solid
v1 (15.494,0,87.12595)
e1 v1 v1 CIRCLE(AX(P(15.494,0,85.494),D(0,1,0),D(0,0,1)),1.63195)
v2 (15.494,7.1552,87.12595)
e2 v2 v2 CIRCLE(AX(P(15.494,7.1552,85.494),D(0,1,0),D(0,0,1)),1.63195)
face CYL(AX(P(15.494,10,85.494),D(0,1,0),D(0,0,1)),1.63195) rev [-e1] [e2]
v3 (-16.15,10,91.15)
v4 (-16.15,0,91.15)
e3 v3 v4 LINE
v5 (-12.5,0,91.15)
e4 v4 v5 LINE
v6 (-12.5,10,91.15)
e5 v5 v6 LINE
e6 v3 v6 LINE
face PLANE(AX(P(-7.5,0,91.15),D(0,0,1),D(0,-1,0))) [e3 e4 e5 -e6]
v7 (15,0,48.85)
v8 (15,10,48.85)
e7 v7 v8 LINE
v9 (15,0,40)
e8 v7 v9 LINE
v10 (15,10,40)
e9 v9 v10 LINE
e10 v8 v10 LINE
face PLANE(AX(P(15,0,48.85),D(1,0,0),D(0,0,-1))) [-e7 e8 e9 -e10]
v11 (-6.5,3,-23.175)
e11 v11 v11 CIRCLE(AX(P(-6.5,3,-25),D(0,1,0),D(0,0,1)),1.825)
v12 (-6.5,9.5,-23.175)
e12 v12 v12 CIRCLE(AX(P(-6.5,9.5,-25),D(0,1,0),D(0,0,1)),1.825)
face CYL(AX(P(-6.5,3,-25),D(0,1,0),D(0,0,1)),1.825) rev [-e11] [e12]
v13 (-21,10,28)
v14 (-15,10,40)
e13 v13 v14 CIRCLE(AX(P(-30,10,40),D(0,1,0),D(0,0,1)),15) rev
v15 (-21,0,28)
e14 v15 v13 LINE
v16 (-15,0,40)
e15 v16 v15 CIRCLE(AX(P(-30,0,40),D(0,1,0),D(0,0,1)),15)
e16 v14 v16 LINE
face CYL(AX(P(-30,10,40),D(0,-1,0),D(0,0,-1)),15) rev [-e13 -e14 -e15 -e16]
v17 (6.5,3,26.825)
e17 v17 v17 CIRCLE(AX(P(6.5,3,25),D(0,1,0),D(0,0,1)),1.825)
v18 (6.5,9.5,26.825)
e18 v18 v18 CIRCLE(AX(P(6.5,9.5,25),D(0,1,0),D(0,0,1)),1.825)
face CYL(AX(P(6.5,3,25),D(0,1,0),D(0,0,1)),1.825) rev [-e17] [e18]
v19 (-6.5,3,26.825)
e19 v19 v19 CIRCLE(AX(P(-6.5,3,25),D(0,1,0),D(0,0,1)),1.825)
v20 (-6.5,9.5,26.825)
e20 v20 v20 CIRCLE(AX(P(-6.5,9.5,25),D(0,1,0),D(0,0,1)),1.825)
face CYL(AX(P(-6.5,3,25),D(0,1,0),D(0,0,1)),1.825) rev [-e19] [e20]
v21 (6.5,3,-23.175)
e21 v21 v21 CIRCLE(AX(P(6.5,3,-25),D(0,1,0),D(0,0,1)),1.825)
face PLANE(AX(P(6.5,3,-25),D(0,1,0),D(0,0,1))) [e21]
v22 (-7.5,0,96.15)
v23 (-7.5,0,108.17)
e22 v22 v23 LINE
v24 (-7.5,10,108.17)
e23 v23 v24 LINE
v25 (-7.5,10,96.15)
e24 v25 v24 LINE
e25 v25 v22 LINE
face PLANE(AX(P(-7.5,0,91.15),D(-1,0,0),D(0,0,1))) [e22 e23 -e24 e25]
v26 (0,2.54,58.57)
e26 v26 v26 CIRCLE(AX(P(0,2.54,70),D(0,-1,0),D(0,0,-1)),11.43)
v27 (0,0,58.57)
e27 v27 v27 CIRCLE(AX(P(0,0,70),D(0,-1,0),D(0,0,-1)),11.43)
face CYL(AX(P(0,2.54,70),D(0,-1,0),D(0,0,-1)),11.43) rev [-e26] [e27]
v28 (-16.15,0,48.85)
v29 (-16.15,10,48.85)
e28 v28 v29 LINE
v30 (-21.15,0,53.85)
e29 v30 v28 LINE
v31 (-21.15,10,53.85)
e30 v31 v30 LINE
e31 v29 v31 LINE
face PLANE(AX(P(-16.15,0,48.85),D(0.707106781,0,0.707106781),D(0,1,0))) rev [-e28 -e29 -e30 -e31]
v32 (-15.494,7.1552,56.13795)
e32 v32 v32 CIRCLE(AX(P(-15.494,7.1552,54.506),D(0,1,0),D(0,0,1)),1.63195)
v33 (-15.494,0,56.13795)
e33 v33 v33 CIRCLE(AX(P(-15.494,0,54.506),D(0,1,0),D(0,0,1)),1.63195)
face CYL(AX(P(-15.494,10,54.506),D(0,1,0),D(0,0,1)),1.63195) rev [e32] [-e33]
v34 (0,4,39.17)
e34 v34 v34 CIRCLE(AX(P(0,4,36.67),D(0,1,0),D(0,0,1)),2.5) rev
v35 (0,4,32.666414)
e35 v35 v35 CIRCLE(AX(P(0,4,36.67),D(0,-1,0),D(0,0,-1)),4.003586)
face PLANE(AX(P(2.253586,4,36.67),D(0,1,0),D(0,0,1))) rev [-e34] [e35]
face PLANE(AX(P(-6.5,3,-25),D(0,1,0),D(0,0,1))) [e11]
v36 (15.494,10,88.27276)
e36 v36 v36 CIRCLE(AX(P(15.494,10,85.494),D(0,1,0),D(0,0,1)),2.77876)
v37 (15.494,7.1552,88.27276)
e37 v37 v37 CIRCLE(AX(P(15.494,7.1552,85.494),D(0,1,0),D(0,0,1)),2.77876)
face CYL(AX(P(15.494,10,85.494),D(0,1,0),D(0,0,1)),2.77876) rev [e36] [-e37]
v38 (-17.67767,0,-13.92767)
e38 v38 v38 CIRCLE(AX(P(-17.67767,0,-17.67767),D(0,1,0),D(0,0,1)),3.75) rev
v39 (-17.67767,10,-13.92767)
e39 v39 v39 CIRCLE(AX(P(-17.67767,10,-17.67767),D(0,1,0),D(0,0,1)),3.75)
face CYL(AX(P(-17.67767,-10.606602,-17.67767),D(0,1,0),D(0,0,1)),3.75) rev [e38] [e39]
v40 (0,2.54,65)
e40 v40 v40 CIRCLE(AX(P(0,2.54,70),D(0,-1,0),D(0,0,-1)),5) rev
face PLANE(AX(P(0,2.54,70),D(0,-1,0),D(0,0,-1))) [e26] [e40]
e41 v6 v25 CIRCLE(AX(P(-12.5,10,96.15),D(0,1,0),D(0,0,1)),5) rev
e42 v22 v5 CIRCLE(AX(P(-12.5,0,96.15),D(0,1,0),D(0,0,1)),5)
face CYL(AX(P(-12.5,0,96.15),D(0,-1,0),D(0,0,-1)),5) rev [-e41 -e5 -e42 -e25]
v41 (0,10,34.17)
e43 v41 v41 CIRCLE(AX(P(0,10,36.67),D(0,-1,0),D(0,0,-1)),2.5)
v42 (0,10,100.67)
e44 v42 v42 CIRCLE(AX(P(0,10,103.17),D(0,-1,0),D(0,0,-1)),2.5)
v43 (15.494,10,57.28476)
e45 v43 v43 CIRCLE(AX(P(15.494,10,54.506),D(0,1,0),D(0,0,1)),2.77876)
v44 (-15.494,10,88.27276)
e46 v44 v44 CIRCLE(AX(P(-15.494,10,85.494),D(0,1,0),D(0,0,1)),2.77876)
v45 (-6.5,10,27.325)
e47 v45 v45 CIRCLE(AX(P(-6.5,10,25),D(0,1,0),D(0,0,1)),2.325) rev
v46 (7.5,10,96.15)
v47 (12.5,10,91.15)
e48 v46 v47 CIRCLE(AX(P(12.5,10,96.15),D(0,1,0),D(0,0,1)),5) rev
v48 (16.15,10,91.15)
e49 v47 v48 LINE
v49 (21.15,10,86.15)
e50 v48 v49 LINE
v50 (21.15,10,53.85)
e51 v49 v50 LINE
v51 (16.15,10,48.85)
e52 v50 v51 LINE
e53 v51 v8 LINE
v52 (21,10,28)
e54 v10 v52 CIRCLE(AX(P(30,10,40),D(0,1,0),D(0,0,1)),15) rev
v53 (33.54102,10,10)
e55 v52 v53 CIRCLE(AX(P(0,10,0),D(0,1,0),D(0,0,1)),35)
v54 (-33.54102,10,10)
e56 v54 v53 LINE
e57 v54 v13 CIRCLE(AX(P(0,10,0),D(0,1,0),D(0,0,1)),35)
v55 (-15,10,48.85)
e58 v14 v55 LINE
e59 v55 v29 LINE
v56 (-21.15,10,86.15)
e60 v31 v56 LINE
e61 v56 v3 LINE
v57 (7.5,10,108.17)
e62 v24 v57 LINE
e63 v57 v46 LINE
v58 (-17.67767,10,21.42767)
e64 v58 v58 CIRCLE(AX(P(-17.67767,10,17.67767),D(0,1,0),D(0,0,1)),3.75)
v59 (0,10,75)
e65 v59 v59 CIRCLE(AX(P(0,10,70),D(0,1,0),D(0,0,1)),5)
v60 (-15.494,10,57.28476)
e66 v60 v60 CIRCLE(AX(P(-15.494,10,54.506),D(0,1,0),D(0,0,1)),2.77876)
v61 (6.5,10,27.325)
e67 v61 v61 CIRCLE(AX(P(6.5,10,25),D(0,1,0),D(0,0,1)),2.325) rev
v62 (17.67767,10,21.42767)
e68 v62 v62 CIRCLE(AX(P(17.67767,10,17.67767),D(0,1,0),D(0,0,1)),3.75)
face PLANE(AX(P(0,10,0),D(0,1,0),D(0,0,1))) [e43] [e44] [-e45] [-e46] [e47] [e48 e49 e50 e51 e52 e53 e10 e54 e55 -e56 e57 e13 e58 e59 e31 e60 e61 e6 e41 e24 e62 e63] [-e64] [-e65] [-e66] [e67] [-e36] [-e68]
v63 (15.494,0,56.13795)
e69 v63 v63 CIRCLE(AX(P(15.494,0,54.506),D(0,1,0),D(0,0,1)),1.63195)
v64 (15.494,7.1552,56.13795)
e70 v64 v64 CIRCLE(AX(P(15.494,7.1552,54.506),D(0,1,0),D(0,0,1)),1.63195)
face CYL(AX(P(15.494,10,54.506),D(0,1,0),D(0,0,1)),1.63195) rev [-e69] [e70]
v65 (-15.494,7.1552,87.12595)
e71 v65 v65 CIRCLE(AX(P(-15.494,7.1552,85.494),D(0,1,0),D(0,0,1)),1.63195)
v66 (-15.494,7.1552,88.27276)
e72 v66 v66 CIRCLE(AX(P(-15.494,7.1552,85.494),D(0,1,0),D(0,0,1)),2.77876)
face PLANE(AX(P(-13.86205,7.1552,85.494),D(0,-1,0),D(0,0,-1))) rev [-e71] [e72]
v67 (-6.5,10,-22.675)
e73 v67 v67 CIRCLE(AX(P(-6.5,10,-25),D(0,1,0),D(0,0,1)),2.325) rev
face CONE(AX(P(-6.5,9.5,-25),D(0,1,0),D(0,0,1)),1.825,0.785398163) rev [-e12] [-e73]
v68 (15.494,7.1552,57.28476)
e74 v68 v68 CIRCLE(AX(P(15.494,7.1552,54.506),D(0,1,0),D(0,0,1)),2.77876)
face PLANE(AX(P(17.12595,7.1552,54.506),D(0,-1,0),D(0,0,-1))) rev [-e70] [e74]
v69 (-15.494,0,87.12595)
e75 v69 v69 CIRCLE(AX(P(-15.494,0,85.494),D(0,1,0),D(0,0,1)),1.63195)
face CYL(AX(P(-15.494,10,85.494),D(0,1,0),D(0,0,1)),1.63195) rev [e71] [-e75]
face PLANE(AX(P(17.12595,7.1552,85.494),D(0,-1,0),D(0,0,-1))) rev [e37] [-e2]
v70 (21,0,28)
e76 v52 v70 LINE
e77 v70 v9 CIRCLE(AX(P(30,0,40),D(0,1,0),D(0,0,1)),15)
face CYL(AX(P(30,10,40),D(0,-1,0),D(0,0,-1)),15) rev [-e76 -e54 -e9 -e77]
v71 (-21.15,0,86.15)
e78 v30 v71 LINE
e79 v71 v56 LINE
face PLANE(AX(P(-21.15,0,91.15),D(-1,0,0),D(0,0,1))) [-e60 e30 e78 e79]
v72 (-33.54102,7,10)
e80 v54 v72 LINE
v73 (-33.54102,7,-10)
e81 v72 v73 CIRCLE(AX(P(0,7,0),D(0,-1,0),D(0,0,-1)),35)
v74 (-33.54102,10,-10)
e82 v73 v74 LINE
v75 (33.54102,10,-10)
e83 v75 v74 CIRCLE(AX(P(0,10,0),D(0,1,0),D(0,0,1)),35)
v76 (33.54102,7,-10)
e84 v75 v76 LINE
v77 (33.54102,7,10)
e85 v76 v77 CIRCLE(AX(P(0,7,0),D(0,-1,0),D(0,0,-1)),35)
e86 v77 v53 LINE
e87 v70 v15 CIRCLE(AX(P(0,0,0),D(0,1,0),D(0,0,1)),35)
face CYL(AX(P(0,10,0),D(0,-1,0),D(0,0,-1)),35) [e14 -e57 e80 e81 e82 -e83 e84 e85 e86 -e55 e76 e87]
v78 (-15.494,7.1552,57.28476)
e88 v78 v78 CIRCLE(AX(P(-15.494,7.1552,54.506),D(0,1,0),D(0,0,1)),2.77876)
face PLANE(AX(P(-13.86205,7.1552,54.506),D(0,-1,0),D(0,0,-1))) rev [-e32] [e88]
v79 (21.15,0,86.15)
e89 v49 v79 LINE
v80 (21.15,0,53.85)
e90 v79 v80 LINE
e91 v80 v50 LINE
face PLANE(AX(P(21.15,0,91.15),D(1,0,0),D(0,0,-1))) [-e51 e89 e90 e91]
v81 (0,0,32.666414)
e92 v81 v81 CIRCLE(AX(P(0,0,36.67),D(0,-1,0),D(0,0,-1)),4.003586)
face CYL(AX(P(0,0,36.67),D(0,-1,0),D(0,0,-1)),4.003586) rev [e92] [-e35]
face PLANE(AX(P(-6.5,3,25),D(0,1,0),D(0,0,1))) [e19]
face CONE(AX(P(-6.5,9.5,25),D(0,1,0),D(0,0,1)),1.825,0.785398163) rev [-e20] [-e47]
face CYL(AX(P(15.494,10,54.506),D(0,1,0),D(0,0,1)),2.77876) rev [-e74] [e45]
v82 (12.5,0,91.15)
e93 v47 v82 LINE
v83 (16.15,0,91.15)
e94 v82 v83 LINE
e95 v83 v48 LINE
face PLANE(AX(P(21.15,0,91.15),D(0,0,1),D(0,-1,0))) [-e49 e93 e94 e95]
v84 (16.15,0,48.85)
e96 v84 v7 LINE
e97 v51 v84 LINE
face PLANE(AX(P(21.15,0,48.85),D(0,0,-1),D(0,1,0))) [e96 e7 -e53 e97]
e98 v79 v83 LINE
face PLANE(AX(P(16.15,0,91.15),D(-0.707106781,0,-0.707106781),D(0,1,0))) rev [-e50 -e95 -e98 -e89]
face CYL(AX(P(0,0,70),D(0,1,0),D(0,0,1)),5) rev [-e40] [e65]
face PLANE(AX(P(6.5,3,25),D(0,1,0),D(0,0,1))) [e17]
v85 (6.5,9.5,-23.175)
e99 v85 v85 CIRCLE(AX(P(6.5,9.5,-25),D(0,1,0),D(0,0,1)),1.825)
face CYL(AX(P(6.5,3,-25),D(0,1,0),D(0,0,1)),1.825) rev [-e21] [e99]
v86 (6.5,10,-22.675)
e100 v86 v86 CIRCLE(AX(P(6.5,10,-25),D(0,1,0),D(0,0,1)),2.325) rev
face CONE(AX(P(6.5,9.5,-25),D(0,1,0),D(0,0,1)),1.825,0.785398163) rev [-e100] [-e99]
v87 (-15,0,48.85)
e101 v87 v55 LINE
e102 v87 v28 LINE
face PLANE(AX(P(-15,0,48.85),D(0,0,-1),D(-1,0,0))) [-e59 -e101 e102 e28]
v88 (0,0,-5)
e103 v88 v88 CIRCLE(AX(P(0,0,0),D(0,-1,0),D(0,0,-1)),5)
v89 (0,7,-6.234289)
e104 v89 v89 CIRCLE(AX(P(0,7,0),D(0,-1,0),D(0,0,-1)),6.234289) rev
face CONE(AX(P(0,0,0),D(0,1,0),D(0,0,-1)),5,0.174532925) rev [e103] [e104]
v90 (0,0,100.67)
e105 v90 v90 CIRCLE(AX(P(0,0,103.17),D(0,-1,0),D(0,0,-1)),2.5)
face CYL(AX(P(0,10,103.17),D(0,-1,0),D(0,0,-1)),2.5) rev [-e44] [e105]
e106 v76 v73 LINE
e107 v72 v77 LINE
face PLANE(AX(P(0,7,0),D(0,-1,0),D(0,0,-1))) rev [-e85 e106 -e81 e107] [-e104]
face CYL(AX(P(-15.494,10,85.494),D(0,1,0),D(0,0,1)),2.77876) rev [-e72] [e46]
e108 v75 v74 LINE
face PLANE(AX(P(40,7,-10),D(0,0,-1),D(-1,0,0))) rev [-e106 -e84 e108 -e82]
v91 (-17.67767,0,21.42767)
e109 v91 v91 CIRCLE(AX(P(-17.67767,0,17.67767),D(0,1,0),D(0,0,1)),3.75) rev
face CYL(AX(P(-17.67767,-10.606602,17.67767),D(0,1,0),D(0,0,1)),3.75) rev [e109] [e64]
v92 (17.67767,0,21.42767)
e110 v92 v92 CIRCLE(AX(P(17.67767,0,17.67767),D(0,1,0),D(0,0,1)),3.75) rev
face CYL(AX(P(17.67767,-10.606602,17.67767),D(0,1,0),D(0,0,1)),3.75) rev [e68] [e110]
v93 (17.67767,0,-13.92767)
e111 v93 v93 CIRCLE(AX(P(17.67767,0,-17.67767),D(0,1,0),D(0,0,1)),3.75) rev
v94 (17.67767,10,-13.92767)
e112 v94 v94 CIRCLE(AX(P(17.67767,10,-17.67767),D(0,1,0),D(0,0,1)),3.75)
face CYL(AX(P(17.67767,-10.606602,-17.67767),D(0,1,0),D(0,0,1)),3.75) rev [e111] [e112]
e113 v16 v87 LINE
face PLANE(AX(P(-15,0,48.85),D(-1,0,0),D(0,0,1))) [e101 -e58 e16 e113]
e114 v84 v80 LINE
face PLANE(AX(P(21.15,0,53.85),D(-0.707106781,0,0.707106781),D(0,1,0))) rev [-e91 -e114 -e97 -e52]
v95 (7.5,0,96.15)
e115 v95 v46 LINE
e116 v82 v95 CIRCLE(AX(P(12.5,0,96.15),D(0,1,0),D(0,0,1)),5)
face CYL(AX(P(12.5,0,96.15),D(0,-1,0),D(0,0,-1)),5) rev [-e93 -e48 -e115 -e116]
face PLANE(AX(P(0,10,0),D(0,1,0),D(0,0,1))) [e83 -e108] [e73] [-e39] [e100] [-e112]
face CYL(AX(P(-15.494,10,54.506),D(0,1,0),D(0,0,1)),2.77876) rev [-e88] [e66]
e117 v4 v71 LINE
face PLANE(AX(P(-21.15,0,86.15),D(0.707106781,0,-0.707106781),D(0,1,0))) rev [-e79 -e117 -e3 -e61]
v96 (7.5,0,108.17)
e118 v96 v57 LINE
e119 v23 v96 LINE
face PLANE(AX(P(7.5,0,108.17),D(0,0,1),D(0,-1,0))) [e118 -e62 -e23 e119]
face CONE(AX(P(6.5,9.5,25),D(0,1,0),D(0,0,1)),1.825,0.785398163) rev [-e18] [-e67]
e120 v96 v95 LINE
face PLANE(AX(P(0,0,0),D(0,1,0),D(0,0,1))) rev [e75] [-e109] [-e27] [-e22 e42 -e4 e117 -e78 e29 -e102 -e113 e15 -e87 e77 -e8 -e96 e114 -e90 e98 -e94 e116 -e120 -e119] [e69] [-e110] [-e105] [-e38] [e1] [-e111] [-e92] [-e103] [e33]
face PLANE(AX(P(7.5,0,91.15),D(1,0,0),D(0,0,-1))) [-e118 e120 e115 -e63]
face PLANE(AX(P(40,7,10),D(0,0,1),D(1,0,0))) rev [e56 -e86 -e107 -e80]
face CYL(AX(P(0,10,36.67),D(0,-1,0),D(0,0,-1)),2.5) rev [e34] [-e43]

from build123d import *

# Parameters (mm, degrees)
SKETCH1_R                                      = 35
BOSS_EXTRUDE1_DEPTH                            = 10
SKETCH3_R                                      = 3.75
CUT_EXTRUDE1_DEPTH                             = 10
SKETCH4_R                                      = 5
BOSS_EXTRUDE2_DEPTH                            = 10
CBORE_FOR_4_SOCKET_HEAD_CAP_SCREW1_D           = 3.2639
CBORE_FOR_4_SOCKET_HEAD_CAP_SCREW1_CBORE_D     = 5.55752
CBORE_FOR_4_SOCKET_HEAD_CAP_SCREW1_CBORE_DEPTH = 2.8448
CHAMFER1_SIZE                                  = 5
SKETCH9_R                                      = 11.43
CUT_EXTRUDE5_DEPTH                             = 2.54
FILLET2_R                                      = 15
FILLET3_R                                      = 5
SKETCH16_R                                     = 5
CUT_EXTRUDE9_DEPTH                             = 115.130403048
CUT_EXTRUDE9_DRAFT                             = 10
SKETCH12_R                                     = 2.5
CUT_EXTRUDE6_DEPTH                             = 115.130403048
CBORE_FOR_M4_SHCS1_OUTLINE_R                   = 4.003586442
CBORE_FOR_M4_SHCS1_OUTLINE_R_2                 = 2.5
CBORE_FOR_M4_SHCS1_DEPTH                       = 4
SKETCH22_W                                     = 80
SKETCH22_H                                     = 20
CUT_EXTRUDE11_DEPTH                            = 3
SKETCH23_R                                     = 1.825
CUT_EXTRUDE12_DEPTH                            = 7
CHAMFER2_SIZE                                  = 0.5


# Read off the part's stored shape, not the designer's step: CBORE for M4 SHCS1
with BuildPart() as part:
    # Sketch1 → Boss-Extrude1 (new body)
    with BuildSketch(Plane(origin=(0, 0, 0), x_dir=(1, 0, 0), z_dir=(0, 1, 0))):
        with Locations(Location((0, 0, 0), (0, 0, 270))):
            Circle(SKETCH1_R)
    extrude(amount=BOSS_EXTRUDE1_DEPTH)

    # Sketch3 → Cut-Extrude1 (cut)
    with BuildSketch(Plane(origin=(0, 10, 0), x_dir=(1, 0, 0), z_dir=(0, 1, 0))):
        with Locations(Location((-17.67766953, 17.67766953, 0), (0, 0, 270))):
            Circle(SKETCH3_R)
        with Locations(Location((17.67766953, 17.67766953, 0), (0, 0, 270))):
            Circle(SKETCH3_R)
        with Locations(Location((17.67766953, -17.67766953, 0), (0, 0, 270))):
            Circle(SKETCH3_R)
        with Locations(Location((-17.67766953, -17.67766953, 0), (0, 0, 270))):
            Circle(SKETCH3_R)
    extrude(amount=-CUT_EXTRUDE1_DEPTH, mode=Mode.SUBTRACT)

    # Sketch4 → Boss-Extrude2 (add)
    with BuildSketch(Plane(origin=(0, 10, 0), x_dir=(1, 0, 0), z_dir=(0, 1, 0))):
        Polygon((-15, -48.85), (-21.15, -48.85), (-21.15, -91.15), (-7.5, -91.15), (-7.5, -108.17), (7.5, -108.17), (7.5, -91.15), (21.15, -91.15), (21.15, -48.85), (15, -48.85), (15, -31.622776602), (-15, -31.622776602), align=None)
        with Locations(Location((0, -70, 0), (0, 0, 270))):
            Circle(SKETCH4_R, mode=Mode.SUBTRACT)
    extrude(amount=-BOSS_EXTRUDE2_DEPTH)

    # CBORE for #4 Socket Head Cap Screw1 (through all)
    with Locations(Plane(origin=(-15.494, 10, 54.506), x_dir=(0, 0, 1), z_dir=(0, 1, 0))):
        with Locations((0, 0), (0, 30.988), (30.988, 30.988), (30.988, 0)):
            CounterBoreHole(CBORE_FOR_4_SOCKET_HEAD_CAP_SCREW1_D / 2, CBORE_FOR_4_SOCKET_HEAD_CAP_SCREW1_CBORE_D / 2, CBORE_FOR_4_SOCKET_HEAD_CAP_SCREW1_CBORE_DEPTH)

    # Chamfer1
    chamfer1_edges = [part.edges().sort_by_distance(p)[0] for p in [
        (-21.15, 5, 91.15),
        (-21.15, 5, 48.85),
        (21.15, 5, 48.85),
        (21.15, 5, 91.15),
    ]]
    chamfer(chamfer1_edges, length=CHAMFER1_SIZE)

    # Sketch9 → Cut-Extrude5 (cut)
    with BuildSketch(Plane(origin=(0, 0, 0), x_dir=(-1, 0, 0), z_dir=(0, -1, 0))):
        with Locations(Location((0, -70, 0), (0, 0, 90))):
            Circle(SKETCH9_R)
    extrude(amount=-CUT_EXTRUDE5_DEPTH, mode=Mode.SUBTRACT)

    # Fillet2
    fillet2_edges = [part.edges().sort_by_distance(p)[0] for p in [
        (-15, 5, 31.622776602),
        (15, 5, 31.622776602),
    ]]
    fillet(fillet2_edges, radius=FILLET2_R)

    # Fillet3
    fillet3_edges = [part.edges().sort_by_distance(p)[0] for p in [
        (7.5, 5, 91.15),
        (-7.5, 5, 91.15),
    ]]
    fillet(fillet3_edges, radius=FILLET3_R)


with BuildPart() as cut_extrude9_tool:
    # Sketch16 → Cut-Extrude9 (with draft: the straight prism first)
    with BuildSketch(Plane(origin=(0, 0, 0), x_dir=(-1, 0, 0), z_dir=(0, -1, 0))):
        Circle(SKETCH16_R)
    extrude(amount=-CUT_EXTRUDE9_DEPTH)
    # Cut-Extrude9: the draft: its side faces are tilted about the plane it starts from
    cut_extrude9_sides = [cut_extrude9_tool.faces().sort_by_distance(p)[0] for p in [
        (5, 57.565201524, 0),
    ]]
    draft(cut_extrude9_sides, Plane(origin=(0, 0, 0), x_dir=(-1, 0, 0), z_dir=(0, -1, 0)), CUT_EXTRUDE9_DRAFT)


with BuildPart() as part_1:
    add(part.part)

    # Cut-Extrude9: cut by cut_extrude9_tool
    add(cut_extrude9_tool.part, mode=Mode.SUBTRACT)

    # Sketch12 → Cut-Extrude6 (cut, through all)
    with BuildSketch(Plane(origin=(0, 0, 0), x_dir=(-1, 0, 0), z_dir=(0, -1, 0))):
        with Locations(Location((0, -36.67, 0), (0, 0, 90))):
            Circle(SKETCH12_R)
        with Locations(Location((0, -103.17, 0), (0, 0, 90))):
            Circle(SKETCH12_R)
    extrude(amount=-CUT_EXTRUDE6_DEPTH, mode=Mode.SUBTRACT)

    # CBORE for M4 SHCS1 outline → CBORE for M4 SHCS1 (cut)
    with BuildSketch(Plane(origin=(0, 0, 0), x_dir=(1, 0, 0), z_dir=(0, 1, 0))):
        with Locations((0, -36.67)):
            Circle(CBORE_FOR_M4_SHCS1_OUTLINE_R)
        with Locations((0, -36.67)):
            Circle(CBORE_FOR_M4_SHCS1_OUTLINE_R_2, mode=Mode.SUBTRACT)
    extrude(amount=CBORE_FOR_M4_SHCS1_DEPTH, mode=Mode.SUBTRACT)

    # Sketch22 → Cut-Extrude11 (cut)
    with BuildSketch(Plane(origin=(0, 10, 0), x_dir=(1, 0, 0), z_dir=(0, 1, 0))):
        Rectangle(SKETCH22_W, SKETCH22_H)
    extrude(amount=-CUT_EXTRUDE11_DEPTH, mode=Mode.SUBTRACT)

    # Sketch23 → Cut-Extrude12 (cut)
    with BuildSketch(Plane(origin=(0, 10, 0), x_dir=(1, 0, 0), z_dir=(0, 1, 0))):
        with Locations(Location((-6.5, 25, 0), (0, 0, 270))):
            Circle(SKETCH23_R)
        with Locations(Location((6.5, 25, 0), (0, 0, 270))):
            Circle(SKETCH23_R)
        with Locations(Location((6.5, -25, 0), (0, 0, 270))):
            Circle(SKETCH23_R)
        with Locations(Location((-6.5, -25, 0), (0, 0, 270))):
            Circle(SKETCH23_R)
    extrude(amount=-CUT_EXTRUDE12_DEPTH, mode=Mode.SUBTRACT)

    # Chamfer2
    chamfer2_edges = [part_1.edges().sort_by_distance(p)[0] for p in [
        (-6.5, 10, -26.825),
        (6.5, 10, -26.825),
        (6.5, 10, 23.175),
        (-6.5, 10, 23.175),
    ]]
    chamfer(chamfer2_edges, length=CHAMFER2_SIZE)


solid = part_1.part
